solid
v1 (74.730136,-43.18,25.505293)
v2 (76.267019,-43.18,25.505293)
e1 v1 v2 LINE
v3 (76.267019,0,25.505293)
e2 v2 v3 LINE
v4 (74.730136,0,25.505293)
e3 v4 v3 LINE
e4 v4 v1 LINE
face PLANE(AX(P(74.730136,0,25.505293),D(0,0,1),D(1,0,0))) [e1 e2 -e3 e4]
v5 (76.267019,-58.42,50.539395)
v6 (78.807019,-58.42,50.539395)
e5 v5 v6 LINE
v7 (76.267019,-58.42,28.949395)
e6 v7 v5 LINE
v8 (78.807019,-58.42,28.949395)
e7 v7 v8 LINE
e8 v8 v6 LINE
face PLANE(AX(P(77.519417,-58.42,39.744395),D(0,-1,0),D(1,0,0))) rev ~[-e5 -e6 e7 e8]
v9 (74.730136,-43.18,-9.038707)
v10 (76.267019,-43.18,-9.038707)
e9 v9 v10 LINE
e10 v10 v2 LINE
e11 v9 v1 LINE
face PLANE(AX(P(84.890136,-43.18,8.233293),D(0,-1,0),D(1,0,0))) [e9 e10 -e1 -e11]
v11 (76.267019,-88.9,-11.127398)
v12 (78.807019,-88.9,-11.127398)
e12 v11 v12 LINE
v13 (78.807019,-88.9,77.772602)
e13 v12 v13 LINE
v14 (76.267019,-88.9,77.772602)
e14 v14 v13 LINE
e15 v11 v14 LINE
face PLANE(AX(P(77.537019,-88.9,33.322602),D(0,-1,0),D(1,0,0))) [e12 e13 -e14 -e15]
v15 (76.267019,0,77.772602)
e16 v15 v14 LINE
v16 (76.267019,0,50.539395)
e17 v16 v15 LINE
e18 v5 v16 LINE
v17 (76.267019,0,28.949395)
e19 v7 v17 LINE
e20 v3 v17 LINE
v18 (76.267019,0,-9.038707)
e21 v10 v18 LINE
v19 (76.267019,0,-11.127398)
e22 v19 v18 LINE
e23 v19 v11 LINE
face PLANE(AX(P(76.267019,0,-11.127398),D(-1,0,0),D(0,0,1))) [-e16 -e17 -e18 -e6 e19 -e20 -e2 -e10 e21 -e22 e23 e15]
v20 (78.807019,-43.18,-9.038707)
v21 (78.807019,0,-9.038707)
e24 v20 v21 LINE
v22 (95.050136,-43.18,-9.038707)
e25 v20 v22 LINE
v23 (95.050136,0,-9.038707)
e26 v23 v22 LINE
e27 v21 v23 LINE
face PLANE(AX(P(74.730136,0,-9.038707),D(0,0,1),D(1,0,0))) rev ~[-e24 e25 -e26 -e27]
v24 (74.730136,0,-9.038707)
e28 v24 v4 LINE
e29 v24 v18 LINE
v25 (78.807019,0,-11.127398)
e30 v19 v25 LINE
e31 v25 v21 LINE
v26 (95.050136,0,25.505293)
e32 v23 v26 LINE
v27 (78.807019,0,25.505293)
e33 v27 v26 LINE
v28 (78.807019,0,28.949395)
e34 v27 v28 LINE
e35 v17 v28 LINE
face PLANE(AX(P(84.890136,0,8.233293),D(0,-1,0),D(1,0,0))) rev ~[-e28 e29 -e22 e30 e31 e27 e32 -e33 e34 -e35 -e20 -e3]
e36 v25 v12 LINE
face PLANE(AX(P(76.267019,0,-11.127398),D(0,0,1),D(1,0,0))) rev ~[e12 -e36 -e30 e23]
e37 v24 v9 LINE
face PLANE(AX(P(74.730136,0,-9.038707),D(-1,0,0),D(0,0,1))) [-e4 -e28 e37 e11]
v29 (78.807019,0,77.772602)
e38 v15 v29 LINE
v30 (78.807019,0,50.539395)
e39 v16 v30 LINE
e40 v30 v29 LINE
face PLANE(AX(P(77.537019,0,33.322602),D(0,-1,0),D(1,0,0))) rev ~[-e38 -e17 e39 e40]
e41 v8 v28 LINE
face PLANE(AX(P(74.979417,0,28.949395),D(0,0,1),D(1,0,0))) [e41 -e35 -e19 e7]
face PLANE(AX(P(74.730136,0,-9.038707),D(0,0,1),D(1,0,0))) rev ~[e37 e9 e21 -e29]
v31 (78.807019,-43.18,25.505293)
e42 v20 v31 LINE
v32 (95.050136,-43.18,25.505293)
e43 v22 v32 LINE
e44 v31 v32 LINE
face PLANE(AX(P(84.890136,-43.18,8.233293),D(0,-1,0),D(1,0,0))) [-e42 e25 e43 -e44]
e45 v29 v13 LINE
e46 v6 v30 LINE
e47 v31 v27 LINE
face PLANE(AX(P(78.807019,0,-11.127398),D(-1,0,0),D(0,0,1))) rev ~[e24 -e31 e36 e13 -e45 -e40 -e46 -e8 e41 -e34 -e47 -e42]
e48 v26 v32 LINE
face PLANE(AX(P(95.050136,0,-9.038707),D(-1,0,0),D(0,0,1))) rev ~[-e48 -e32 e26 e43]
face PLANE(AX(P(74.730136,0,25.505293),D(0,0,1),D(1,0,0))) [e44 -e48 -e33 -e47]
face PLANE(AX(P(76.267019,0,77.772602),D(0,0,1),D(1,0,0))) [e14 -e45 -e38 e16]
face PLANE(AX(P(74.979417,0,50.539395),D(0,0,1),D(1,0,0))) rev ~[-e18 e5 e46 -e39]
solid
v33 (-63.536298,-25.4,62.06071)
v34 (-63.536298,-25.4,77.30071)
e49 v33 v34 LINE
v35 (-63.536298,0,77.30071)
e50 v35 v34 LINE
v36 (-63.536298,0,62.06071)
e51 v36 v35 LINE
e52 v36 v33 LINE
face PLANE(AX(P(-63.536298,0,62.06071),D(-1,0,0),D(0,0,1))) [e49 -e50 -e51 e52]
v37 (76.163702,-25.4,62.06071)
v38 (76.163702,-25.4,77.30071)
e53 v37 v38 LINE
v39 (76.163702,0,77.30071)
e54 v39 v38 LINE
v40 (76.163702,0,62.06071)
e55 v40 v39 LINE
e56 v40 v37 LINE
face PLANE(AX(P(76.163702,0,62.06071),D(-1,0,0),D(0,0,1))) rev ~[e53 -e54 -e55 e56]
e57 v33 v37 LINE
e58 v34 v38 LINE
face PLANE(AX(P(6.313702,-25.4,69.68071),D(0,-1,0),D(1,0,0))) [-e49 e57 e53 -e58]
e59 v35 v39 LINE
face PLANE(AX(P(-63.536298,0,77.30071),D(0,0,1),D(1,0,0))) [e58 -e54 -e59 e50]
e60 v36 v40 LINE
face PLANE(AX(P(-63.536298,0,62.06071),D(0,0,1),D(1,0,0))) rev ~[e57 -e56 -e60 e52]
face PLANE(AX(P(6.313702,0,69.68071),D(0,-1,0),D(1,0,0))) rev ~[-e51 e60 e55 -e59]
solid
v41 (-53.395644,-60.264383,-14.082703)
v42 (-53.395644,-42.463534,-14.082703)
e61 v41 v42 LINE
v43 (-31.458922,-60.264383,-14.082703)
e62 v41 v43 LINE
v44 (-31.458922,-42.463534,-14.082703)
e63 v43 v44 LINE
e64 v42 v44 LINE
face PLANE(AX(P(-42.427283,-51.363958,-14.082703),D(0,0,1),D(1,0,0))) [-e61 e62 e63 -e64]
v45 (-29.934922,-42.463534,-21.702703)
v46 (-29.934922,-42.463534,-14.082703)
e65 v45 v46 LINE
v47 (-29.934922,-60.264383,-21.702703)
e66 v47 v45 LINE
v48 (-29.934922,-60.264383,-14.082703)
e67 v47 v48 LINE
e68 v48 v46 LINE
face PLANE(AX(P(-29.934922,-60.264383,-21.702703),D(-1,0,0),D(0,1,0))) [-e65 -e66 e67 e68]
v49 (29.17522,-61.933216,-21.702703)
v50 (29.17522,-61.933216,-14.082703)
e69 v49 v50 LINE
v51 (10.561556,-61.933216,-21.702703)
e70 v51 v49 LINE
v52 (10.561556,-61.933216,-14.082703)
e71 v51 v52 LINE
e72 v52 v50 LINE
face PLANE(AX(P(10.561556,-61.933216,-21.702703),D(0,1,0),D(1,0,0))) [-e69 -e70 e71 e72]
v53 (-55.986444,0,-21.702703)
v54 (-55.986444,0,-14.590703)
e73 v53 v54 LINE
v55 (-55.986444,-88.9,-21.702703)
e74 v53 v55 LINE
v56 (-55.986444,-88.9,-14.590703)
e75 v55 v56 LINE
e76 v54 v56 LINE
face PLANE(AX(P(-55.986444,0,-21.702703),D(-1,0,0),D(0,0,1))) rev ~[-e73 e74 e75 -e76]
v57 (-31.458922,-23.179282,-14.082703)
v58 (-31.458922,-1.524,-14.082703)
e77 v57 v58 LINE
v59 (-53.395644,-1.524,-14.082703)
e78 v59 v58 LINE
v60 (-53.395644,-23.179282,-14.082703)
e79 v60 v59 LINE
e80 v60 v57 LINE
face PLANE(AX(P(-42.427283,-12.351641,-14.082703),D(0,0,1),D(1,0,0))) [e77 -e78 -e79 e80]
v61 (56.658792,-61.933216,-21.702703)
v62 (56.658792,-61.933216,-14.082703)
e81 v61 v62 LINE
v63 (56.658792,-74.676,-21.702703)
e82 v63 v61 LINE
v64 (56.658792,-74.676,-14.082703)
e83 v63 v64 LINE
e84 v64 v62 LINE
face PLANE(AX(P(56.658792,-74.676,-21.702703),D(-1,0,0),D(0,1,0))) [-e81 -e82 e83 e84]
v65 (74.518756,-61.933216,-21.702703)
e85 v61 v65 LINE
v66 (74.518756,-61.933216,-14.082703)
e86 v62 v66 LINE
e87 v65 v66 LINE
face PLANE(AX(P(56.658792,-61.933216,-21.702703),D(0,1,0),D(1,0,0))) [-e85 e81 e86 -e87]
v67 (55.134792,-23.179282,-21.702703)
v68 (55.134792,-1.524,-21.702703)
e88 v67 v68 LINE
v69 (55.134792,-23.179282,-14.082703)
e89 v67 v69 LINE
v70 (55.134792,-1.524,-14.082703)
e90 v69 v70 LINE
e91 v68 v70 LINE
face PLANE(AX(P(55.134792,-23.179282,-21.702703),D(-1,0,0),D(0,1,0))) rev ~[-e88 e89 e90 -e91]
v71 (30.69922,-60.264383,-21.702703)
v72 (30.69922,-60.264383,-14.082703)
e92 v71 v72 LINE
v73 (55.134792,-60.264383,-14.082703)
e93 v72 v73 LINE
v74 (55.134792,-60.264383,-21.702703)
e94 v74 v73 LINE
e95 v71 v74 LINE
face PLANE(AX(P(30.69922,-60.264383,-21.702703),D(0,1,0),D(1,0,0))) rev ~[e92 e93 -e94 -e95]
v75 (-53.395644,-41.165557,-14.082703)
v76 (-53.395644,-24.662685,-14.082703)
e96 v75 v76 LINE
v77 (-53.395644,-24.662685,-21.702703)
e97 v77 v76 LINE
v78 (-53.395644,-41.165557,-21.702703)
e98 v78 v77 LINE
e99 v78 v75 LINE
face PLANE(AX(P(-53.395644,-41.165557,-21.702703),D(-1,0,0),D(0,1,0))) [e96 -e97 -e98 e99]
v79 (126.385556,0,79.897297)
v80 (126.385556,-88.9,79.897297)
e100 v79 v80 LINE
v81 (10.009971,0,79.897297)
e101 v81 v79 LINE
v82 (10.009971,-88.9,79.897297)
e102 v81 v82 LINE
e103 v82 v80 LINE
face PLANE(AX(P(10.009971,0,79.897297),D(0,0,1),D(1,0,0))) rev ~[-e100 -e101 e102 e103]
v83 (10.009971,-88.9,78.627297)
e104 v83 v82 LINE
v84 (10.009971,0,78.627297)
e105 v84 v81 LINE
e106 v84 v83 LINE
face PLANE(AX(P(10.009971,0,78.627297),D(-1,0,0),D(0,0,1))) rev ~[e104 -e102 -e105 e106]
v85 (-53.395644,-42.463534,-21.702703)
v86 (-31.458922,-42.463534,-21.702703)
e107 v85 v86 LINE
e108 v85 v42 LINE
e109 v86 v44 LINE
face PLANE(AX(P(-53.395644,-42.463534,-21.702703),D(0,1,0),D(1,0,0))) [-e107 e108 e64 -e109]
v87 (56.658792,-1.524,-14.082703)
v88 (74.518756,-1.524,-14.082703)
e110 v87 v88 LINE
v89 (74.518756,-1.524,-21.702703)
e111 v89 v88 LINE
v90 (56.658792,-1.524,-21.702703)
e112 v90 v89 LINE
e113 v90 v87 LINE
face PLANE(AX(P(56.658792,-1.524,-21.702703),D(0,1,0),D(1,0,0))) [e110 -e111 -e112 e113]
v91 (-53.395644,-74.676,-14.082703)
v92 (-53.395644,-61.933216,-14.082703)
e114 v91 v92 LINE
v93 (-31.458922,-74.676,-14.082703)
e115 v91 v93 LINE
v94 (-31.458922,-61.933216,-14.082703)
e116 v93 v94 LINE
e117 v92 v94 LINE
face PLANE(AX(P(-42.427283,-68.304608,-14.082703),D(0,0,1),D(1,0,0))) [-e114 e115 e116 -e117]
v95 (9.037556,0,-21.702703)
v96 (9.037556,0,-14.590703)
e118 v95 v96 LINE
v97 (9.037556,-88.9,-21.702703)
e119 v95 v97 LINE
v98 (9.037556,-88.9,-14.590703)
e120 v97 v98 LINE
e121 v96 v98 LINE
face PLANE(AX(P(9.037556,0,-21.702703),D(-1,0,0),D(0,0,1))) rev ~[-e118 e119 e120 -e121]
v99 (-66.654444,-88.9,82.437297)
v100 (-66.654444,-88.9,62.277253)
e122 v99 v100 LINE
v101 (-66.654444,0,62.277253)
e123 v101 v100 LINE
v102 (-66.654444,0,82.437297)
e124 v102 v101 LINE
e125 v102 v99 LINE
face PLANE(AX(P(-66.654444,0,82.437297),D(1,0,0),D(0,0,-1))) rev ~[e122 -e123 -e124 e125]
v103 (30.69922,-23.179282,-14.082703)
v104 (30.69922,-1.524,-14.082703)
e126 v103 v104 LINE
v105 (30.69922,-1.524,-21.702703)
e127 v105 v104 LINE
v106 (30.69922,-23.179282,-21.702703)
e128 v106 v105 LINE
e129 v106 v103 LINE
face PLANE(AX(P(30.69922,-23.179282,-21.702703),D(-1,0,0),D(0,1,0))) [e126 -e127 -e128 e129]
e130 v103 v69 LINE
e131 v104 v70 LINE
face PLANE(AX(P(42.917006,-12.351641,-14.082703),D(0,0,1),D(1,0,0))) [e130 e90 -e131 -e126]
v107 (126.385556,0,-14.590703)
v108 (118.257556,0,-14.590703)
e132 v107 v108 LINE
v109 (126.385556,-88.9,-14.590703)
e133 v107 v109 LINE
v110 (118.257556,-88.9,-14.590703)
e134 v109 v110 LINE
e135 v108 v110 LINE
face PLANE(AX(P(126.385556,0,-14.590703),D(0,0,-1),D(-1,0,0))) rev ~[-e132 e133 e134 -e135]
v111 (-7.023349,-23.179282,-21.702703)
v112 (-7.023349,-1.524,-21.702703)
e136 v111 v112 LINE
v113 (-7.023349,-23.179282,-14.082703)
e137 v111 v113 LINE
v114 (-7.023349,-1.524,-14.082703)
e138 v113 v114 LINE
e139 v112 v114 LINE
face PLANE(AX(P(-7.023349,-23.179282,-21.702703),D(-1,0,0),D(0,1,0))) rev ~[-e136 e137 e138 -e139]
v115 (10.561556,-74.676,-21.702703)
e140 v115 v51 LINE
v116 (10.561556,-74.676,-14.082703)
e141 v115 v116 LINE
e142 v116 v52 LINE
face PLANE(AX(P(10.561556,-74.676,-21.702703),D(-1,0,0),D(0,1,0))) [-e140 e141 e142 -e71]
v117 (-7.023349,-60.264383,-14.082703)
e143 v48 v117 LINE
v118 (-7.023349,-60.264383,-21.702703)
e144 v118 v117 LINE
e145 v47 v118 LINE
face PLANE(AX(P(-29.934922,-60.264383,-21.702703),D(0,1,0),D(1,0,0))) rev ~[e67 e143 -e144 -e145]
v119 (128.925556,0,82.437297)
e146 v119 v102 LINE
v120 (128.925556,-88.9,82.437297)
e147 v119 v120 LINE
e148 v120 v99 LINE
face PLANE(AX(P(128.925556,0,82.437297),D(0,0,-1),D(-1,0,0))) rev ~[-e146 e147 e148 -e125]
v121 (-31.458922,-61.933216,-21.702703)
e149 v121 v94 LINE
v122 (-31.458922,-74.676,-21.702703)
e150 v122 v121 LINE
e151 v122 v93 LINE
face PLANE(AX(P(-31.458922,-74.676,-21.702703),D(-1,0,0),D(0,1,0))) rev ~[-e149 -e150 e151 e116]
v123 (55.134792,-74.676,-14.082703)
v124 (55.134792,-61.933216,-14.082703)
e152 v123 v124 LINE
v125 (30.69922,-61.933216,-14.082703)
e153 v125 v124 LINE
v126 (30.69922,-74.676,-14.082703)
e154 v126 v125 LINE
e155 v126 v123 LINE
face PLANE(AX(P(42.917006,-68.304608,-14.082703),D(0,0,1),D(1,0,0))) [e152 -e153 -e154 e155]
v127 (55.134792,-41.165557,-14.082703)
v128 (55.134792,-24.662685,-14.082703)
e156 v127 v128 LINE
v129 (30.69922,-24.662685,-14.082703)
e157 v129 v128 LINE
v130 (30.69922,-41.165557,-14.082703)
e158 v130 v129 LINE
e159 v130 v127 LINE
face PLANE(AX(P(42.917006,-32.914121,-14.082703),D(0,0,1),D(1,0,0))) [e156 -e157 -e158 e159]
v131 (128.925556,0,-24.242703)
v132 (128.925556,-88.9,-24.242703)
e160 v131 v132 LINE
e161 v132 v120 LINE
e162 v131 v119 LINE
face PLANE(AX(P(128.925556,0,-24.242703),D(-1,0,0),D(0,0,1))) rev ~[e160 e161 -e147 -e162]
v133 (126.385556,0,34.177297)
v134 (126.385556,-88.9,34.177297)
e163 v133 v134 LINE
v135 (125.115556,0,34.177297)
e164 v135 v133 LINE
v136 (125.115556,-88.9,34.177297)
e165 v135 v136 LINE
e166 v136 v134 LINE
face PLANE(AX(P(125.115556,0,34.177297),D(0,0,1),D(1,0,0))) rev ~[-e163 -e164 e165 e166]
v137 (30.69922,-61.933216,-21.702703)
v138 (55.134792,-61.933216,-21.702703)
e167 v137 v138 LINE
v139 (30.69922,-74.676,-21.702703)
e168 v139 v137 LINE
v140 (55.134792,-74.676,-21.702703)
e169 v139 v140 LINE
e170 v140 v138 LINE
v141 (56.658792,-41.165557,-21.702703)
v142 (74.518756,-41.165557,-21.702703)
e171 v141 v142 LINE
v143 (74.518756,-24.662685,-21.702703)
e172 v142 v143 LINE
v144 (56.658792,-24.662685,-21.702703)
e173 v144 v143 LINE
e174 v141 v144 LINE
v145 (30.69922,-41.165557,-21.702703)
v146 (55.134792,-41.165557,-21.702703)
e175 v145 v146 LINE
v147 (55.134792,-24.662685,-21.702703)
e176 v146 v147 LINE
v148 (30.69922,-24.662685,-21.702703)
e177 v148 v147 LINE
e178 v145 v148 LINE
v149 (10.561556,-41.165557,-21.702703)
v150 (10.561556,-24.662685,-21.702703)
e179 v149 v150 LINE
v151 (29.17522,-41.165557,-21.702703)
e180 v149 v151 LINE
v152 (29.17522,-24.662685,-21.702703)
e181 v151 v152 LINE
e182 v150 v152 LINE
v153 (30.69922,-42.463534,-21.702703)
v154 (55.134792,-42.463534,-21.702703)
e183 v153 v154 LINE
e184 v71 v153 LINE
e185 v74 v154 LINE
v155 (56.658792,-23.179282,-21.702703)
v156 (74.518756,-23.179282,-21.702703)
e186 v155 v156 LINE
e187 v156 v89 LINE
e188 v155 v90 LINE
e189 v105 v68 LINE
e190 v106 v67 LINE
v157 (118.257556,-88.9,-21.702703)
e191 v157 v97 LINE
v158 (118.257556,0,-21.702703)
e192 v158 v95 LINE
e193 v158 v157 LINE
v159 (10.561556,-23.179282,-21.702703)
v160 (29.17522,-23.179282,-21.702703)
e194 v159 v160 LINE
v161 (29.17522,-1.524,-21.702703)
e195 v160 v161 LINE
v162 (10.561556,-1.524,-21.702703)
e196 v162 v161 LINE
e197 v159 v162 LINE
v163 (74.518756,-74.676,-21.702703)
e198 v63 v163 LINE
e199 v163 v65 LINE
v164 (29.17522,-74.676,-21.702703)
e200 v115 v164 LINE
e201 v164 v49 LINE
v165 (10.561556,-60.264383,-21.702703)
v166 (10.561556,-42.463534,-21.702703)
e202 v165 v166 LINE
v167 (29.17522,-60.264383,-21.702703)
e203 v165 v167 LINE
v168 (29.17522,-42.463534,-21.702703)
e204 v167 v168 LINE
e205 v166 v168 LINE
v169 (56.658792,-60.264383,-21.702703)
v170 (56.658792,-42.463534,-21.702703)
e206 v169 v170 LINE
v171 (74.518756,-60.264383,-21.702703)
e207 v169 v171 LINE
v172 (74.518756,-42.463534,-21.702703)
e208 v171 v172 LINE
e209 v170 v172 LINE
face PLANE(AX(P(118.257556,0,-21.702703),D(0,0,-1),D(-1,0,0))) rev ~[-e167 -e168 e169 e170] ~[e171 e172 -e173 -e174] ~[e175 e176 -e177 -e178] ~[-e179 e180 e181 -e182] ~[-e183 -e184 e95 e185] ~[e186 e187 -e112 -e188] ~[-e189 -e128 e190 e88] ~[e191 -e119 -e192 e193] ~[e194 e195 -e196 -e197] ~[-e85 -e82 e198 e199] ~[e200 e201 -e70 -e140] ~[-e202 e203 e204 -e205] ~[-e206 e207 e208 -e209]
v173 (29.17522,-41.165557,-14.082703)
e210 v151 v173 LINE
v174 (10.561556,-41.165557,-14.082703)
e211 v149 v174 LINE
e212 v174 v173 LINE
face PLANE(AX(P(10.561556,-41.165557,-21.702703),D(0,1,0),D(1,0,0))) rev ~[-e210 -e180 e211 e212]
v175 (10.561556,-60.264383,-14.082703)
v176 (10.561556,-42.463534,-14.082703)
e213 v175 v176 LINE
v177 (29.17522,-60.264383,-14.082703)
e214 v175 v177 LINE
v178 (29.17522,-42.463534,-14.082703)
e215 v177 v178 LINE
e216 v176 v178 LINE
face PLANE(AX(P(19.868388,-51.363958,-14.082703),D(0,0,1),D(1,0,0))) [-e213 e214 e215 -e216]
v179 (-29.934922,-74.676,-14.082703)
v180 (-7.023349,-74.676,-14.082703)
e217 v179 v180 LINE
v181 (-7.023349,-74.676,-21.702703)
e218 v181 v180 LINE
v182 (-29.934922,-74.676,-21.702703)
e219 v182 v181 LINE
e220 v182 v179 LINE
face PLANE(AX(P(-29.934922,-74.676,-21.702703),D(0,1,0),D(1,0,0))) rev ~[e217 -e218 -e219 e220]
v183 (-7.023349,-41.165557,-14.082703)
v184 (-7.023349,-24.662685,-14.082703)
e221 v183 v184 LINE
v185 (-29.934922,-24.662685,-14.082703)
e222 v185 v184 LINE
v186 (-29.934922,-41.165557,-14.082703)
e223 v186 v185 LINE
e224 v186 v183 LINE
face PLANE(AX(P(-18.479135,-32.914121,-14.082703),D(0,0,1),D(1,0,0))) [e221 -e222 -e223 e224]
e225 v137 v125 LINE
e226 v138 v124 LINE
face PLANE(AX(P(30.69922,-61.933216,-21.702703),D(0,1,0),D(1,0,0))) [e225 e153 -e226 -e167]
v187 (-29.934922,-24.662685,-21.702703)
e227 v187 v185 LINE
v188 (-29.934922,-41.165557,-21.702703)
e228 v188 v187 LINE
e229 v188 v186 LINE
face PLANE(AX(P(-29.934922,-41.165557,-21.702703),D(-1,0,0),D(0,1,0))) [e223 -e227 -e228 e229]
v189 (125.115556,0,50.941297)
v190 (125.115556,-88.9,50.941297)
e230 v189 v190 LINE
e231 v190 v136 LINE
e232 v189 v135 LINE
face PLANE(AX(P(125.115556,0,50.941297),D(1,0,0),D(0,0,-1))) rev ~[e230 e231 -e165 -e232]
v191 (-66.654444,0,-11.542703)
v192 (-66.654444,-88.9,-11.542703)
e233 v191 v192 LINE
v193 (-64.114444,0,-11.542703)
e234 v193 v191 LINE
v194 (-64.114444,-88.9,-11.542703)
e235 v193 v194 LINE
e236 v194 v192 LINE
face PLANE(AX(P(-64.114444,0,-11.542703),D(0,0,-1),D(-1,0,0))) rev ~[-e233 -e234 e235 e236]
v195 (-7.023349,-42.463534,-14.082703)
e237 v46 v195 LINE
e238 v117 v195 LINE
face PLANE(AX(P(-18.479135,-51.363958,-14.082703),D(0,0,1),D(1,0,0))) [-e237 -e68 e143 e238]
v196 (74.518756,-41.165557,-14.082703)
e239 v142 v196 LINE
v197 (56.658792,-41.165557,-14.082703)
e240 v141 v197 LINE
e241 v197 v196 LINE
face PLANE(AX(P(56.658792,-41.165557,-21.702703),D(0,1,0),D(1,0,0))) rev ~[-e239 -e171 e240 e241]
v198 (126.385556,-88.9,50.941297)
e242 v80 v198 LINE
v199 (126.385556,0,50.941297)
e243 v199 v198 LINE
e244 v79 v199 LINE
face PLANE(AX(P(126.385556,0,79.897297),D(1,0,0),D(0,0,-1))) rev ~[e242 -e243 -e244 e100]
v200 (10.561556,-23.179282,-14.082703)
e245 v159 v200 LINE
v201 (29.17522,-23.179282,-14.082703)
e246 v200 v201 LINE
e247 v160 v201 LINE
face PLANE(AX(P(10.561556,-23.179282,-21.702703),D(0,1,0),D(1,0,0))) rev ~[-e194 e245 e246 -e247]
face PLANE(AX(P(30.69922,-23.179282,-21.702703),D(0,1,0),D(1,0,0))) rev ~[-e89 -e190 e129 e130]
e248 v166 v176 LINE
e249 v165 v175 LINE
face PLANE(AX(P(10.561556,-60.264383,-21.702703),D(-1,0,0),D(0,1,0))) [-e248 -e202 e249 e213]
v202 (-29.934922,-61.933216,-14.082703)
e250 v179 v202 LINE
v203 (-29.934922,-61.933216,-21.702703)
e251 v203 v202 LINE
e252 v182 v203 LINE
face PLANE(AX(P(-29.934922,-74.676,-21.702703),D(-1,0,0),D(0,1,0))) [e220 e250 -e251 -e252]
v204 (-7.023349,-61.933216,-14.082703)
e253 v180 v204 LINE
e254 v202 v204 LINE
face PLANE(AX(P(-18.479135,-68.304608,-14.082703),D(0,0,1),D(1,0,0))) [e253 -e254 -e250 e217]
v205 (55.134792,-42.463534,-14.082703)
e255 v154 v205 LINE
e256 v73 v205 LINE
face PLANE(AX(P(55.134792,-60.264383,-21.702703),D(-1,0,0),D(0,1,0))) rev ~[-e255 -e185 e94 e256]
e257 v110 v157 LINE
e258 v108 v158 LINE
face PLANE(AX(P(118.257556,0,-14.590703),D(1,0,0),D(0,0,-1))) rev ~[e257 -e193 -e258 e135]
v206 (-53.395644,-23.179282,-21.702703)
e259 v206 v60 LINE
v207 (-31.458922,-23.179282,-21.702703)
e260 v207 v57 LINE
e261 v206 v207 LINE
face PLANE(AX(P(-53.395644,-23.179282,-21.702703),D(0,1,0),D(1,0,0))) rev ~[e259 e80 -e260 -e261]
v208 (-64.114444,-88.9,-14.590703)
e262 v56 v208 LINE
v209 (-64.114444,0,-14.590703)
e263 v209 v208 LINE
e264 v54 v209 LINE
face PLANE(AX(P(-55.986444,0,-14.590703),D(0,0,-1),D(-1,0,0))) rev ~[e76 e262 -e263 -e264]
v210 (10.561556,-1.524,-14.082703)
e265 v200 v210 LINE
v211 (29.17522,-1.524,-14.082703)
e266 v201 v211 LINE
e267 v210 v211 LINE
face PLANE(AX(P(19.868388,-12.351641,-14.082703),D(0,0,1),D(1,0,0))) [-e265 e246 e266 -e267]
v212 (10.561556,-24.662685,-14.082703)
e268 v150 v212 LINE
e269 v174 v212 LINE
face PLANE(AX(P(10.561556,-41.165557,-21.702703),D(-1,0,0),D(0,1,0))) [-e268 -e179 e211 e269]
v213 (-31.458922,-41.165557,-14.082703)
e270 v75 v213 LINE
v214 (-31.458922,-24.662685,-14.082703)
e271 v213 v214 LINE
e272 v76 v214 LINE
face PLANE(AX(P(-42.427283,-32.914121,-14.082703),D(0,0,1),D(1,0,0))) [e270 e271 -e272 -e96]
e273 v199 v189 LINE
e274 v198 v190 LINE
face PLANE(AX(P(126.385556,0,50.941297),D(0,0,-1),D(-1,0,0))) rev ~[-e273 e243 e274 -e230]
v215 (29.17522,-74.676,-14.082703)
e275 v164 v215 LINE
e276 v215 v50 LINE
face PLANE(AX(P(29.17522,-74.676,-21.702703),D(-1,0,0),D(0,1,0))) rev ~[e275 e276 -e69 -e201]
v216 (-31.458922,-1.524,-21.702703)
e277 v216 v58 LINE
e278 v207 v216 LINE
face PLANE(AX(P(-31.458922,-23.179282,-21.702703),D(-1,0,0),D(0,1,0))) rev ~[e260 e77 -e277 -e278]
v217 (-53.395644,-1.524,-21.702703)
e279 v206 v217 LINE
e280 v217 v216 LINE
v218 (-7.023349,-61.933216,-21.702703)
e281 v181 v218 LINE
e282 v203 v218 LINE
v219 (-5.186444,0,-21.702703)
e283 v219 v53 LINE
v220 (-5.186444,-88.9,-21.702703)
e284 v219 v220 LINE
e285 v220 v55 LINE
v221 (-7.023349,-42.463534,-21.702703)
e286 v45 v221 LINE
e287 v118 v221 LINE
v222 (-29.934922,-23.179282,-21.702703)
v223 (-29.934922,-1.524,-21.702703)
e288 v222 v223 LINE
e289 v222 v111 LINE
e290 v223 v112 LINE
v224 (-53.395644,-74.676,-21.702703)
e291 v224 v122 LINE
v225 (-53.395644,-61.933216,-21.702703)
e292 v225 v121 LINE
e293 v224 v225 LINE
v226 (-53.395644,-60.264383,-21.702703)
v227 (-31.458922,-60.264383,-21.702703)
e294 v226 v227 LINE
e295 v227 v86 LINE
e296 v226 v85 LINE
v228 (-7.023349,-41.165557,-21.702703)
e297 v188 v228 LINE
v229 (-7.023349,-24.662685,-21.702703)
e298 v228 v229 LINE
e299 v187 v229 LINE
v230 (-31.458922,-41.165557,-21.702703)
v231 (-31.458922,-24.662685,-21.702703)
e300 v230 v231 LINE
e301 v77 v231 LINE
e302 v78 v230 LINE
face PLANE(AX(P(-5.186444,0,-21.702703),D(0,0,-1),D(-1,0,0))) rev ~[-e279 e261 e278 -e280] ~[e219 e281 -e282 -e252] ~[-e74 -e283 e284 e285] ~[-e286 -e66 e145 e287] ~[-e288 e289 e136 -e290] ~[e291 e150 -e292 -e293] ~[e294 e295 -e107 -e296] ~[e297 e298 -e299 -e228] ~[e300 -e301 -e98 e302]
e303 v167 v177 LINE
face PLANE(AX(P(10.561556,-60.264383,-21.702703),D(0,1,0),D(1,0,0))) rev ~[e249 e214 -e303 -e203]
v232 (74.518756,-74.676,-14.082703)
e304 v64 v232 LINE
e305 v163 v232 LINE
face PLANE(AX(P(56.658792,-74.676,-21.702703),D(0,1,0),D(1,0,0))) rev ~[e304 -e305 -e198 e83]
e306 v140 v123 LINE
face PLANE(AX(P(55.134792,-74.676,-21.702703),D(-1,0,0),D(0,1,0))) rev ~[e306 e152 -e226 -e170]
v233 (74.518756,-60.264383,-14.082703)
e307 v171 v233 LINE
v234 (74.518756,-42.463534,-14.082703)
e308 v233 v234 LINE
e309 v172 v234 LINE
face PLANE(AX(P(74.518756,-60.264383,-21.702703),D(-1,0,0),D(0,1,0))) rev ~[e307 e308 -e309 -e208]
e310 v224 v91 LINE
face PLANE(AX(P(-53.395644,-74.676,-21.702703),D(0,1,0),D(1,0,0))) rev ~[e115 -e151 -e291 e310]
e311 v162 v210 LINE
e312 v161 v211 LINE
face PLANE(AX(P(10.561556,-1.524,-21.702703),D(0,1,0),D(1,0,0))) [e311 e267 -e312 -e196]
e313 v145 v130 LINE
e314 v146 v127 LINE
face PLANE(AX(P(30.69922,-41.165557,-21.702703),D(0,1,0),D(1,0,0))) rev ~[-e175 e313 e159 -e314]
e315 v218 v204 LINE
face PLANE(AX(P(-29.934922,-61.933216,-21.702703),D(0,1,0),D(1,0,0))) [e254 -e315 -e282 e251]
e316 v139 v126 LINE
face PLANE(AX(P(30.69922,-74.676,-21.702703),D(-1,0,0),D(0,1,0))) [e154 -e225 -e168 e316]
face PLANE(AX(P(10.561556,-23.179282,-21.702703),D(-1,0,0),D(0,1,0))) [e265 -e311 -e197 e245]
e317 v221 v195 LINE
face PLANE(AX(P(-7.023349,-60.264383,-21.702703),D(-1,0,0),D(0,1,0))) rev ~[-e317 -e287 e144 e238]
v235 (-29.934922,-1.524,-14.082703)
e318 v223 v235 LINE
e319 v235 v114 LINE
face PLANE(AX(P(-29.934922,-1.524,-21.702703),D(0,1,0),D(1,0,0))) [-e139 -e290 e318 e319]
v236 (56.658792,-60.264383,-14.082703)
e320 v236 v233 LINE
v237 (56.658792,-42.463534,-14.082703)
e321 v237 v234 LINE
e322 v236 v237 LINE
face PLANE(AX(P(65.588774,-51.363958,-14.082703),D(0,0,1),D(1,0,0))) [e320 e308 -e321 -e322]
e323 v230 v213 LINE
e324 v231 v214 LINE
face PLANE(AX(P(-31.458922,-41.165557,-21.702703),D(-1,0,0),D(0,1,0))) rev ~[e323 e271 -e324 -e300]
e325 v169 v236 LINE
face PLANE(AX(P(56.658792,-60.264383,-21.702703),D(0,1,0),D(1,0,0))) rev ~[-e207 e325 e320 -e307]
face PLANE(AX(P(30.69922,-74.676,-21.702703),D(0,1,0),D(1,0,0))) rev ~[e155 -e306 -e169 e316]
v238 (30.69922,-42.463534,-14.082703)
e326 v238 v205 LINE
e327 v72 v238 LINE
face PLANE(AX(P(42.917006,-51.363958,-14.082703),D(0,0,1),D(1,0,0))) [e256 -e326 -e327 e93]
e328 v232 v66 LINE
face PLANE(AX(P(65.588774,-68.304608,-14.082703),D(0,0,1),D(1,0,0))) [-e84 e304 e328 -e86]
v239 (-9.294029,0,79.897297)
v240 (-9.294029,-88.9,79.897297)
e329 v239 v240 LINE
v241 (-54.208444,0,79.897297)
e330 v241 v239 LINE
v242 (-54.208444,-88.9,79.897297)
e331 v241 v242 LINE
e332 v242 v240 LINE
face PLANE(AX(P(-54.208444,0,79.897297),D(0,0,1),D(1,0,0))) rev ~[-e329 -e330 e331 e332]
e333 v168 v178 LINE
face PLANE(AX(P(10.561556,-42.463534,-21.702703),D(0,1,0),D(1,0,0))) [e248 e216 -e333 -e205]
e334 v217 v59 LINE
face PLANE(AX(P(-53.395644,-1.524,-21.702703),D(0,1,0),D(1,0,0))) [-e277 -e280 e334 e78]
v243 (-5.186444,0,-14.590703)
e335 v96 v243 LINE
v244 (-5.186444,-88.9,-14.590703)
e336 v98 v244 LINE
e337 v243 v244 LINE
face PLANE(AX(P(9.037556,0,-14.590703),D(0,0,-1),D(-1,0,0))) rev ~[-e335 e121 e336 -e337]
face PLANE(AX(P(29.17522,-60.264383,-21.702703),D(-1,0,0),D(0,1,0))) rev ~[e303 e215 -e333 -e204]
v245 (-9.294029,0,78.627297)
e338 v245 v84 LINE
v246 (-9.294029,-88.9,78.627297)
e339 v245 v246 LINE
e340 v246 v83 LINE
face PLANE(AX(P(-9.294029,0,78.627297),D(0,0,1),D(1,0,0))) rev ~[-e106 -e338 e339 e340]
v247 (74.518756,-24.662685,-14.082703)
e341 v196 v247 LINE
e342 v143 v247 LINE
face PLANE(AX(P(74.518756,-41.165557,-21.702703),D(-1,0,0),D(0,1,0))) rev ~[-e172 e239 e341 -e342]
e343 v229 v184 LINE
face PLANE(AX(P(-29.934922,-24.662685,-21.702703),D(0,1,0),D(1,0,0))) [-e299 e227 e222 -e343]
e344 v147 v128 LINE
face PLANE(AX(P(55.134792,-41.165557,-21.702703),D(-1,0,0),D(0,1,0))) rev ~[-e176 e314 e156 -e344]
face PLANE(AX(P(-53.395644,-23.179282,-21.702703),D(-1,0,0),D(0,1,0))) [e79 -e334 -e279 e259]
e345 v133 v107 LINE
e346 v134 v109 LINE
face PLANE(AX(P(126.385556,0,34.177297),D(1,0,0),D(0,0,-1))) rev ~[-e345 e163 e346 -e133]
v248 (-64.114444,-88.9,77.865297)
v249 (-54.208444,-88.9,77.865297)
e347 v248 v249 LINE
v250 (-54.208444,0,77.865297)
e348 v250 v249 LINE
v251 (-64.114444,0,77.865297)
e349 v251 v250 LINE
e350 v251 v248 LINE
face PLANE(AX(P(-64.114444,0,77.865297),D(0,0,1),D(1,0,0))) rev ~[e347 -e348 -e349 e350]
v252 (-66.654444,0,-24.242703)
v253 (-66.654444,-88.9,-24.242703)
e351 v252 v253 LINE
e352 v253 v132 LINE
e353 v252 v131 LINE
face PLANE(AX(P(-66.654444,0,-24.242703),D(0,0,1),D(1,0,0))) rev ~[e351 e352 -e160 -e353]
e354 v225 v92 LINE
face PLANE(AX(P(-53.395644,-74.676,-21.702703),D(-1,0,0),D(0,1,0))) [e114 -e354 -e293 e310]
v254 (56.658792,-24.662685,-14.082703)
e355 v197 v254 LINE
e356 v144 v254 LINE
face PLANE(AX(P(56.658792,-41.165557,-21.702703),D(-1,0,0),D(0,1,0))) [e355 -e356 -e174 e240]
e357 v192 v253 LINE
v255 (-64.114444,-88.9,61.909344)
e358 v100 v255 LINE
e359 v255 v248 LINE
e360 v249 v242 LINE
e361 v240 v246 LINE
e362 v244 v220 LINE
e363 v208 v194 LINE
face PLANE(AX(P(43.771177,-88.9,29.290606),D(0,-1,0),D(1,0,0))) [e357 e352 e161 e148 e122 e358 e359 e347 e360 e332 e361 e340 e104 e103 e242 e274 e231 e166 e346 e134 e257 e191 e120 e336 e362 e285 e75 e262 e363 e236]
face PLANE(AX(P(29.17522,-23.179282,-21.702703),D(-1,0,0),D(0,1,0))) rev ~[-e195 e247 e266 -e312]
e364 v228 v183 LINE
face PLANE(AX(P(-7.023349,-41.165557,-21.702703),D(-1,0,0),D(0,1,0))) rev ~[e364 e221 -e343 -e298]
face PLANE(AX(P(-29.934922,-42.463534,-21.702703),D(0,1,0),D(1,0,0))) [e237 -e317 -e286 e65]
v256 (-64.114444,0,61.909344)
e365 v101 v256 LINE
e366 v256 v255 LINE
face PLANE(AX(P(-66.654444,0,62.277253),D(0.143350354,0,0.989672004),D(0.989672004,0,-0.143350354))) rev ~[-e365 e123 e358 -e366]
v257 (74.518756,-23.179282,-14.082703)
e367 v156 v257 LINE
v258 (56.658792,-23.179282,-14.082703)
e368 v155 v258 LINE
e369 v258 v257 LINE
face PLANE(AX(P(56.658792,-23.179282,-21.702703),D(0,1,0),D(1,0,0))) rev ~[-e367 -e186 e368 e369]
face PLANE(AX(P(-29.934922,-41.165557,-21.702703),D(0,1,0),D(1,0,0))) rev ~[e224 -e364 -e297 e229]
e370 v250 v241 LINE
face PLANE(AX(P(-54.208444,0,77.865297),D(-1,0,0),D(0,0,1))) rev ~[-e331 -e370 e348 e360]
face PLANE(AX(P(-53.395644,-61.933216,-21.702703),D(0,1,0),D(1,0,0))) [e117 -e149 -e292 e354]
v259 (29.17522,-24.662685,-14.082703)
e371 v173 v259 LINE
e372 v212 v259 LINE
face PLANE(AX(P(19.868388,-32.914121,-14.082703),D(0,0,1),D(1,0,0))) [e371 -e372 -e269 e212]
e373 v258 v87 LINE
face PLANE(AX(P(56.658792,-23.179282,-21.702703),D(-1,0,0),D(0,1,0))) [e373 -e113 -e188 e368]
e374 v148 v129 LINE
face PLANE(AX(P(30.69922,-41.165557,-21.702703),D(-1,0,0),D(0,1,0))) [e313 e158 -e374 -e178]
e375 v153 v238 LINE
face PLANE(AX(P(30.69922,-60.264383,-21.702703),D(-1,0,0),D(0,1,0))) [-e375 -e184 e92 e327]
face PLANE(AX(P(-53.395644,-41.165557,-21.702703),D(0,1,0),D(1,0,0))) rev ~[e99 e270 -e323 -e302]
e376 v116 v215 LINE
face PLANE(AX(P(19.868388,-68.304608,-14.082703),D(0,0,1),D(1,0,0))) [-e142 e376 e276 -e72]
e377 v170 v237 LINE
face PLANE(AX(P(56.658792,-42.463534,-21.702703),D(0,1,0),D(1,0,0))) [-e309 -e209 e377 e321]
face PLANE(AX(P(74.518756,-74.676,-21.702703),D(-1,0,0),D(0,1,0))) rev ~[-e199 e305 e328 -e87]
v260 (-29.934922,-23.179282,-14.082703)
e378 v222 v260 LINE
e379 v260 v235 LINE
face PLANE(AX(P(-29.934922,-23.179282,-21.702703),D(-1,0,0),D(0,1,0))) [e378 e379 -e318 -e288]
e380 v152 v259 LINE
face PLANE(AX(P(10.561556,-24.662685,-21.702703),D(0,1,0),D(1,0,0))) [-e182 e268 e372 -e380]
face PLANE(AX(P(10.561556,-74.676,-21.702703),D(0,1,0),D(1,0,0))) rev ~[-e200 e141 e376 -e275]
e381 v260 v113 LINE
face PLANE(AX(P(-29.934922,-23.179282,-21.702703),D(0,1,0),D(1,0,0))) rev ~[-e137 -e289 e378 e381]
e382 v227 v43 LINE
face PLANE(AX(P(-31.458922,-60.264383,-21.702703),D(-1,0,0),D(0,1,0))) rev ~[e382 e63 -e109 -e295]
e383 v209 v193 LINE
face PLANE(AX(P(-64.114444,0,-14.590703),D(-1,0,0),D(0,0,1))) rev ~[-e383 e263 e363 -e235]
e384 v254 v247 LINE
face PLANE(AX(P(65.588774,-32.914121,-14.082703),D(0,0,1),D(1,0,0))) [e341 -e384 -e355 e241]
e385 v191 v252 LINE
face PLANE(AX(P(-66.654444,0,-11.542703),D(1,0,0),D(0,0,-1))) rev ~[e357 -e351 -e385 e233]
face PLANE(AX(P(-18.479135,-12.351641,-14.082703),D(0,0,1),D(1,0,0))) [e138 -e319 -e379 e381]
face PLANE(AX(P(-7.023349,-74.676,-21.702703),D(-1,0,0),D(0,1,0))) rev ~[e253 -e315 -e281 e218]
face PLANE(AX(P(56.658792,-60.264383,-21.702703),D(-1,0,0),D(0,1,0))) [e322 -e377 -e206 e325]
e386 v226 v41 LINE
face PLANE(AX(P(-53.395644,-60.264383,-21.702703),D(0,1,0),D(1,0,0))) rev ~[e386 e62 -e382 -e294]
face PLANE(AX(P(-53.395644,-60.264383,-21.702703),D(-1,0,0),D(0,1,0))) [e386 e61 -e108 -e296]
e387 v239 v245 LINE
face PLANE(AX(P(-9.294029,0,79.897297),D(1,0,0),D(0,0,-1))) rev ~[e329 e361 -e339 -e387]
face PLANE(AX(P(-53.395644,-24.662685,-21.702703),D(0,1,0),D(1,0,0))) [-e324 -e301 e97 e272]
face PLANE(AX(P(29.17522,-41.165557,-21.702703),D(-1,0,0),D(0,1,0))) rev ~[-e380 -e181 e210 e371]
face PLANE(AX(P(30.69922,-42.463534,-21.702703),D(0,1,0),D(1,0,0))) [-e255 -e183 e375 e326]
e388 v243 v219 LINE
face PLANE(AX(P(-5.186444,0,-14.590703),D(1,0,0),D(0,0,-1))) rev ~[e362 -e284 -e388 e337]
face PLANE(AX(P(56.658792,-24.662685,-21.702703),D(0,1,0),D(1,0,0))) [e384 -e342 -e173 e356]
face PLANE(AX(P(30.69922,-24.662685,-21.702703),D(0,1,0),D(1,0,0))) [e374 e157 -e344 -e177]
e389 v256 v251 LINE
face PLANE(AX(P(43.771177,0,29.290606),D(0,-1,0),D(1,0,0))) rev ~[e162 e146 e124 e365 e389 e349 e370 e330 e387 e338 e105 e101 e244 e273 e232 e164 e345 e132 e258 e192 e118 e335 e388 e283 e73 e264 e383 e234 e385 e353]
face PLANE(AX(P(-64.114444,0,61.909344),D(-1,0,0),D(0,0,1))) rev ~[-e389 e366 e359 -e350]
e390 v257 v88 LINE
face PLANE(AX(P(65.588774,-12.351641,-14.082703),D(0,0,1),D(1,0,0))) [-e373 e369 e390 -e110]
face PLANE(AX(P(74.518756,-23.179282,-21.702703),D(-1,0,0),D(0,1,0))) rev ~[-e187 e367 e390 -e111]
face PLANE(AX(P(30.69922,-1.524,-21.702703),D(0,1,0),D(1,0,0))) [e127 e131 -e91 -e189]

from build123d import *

# Parameters (mm, degrees)
F5_DEPTH  = 88.9
F3_W      = 2.54
F3_H      = 88.9
F1_W      = 139.7
F1_H      = 15.24
F8_DEPTH  = 25.4
F7_W      = 5.08
F7_H      = 21.59
F9_DEPTH  = 58.42
F2_W      = 20.32
F2_H      = 34.544
F10_DEPTH = 43.18
F11_W     = 21.9367220569
F11_H     = 12.7427842925
F11_H_2   = 17.8008489311
F11_W_2   = 22.9115727548
F11_H_3   = 16.5028721094
F11_H_4   = 21.655281503
F11_W_3   = 18.6136638447
F11_W_4   = 24.4355718235
F11_W_5   = 17.8599643318
F12_DEPTH = 7.62


# Not quite as in the source:
# - a feature of the source that left no trace in its solid (it failed there, or was rolled back) is left out
# - a feature names something its author has since deleted; it is built from what else it names


with BuildPart() as f5:
    # F0 (on Front) → F5 (new body)
    with BuildSketch(Plane.XZ):
        Polygon((-54.2084437874, 77.8652965117), (-54.2084437874, 79.8972965117), (-9.2940292287, 79.8972965117), (-9.2940292287, 78.6272965117), (10.0099707713, 78.6272965117), (10.0099707713, 79.8972965117), (126.3855562126, 79.8972965117), (126.3855562126, 50.9412965117), (125.1155562126, 50.9412965117), (125.1155562126, 34.1772965117), (126.3855562126, 34.1772965117), (126.3855562126, -14.5907034883), (118.2575562126, -14.5907034883), (118.2575562126, -21.7027034883), (9.0375562126, -21.7027034883), (9.0375562126, -14.5907034883), (-5.1864437874, -14.5907034883), (-5.1864437874, -21.7027034883), (-55.9864437874, -21.7027034883), (-55.9864437874, -14.5907034883), (-64.1144437874, -14.5907034883), (-64.1144437874, -11.5427034883), (-66.6544437874, -11.5427034883), (-66.6544437874, -24.2427034883), (128.9255562126, -24.2427034883), (128.9255562126, -21.7027034883), (128.9255562126, 82.4372965117), (-66.6544437874, 82.4372965117), (-66.6544437874, 62.2772533174), (-64.1144437874, 61.9093436475), (-64.1144437874, 77.8652965117), align=None)
    extrude(amount=F5_DEPTH)

    # F11 (on face) → F12 (join)
    with BuildSketch(Plane.XY.offset(-21.7027034883)):
        with Locations((-42.4272827589, -68.3046078538)):
            Rectangle(F11_W, F11_H)
        with Locations((-42.4272827589, -51.3639580458)):
            Rectangle(F11_W, F11_H_2)
        with Locations((-18.4791353531, -51.3639580458)):
            Rectangle(F11_W_2, F11_H_2)
        with Locations((-18.4791353531, -68.3046078538)):
            Rectangle(F11_W_2, F11_H)
        with Locations((-42.4272827589, -32.9141207039)):
            Rectangle(F11_W, F11_H_3)
        with Locations((-18.4791353531, -32.9141207039)):
            Rectangle(F11_W_2, F11_H_3)
        with Locations((-18.4791353531, -12.3516407515)):
            Rectangle(F11_W_2, F11_H_4)
        with Locations((-42.4272827589, -12.3516407515)):
            Rectangle(F11_W, F11_H_4)
        with Locations((19.868388135, -32.9141207039)):
            Rectangle(F11_W_3, F11_H_3)
        with Locations((19.868388135, -51.3639580458)):
            Rectangle(F11_W_3, F11_H_2)
        with Locations((19.868388135, -68.3046078538)):
            Rectangle(F11_W_3, F11_H)
        with Locations((42.9170059691, -68.3046078538)):
            Rectangle(F11_W_4, F11_H)
        with Locations((65.5887740467, -68.3046078538)):
            Rectangle(F11_W_5, F11_H)
        with Locations((65.5887740467, -51.3639580458)):
            Rectangle(F11_W_5, F11_H_2)
        with Locations((42.9170059691, -51.3639580458)):
            Rectangle(F11_W_4, F11_H_2)
        with Locations((42.9170059691, -32.9141207039)):
            Rectangle(F11_W_4, F11_H_3)
        with Locations((65.5887740467, -32.9141207039)):
            Rectangle(F11_W_5, F11_H_3)
        with Locations((65.5887740467, -12.3516407515)):
            Rectangle(F11_W_5, F11_H_4)
        with Locations((42.9170059691, -12.3516407515)):
            Rectangle(F11_W_4, F11_H_4)
        with Locations((19.868388135, -12.3516407515)):
            Rectangle(F11_W_3, F11_H_4)
    extrude(amount=F12_DEPTH)


with BuildPart() as f5b:
    # F3 (on Front) → F5, piece 2 (new body)
    with BuildSketch(Plane.XZ):
        with Locations((77.5370186973, 33.3226016507)):
            Rectangle(F3_W, F3_H)
    extrude(amount=F5_DEPTH)

    # F7 (on Front) → F9 (cut)
    with BuildSketch(Plane.XZ):
        with Locations((77.5194165921, 39.7443948221)):
            Rectangle(F7_W, F7_H)
    extrude(amount=F9_DEPTH, mode=Mode.SUBTRACT)

    # F2 (on Front) → F10 (join)
    with BuildSketch(Plane.XZ):
        with Locations((84.8901355004, 8.2332931607)):
            Rectangle(F2_W, F2_H)
    extrude(amount=F10_DEPTH)


with BuildPart() as f8:
    # F1 (on Front) → F8 (new body)
    with BuildSketch(Plane.XZ):
        with Locations((6.3137017131, 69.6807100427)):
            Rectangle(F1_W, F1_H)
    extrude(amount=F8_DEPTH)


solid = Compound([f5.part, f5b.part, f8.part])
